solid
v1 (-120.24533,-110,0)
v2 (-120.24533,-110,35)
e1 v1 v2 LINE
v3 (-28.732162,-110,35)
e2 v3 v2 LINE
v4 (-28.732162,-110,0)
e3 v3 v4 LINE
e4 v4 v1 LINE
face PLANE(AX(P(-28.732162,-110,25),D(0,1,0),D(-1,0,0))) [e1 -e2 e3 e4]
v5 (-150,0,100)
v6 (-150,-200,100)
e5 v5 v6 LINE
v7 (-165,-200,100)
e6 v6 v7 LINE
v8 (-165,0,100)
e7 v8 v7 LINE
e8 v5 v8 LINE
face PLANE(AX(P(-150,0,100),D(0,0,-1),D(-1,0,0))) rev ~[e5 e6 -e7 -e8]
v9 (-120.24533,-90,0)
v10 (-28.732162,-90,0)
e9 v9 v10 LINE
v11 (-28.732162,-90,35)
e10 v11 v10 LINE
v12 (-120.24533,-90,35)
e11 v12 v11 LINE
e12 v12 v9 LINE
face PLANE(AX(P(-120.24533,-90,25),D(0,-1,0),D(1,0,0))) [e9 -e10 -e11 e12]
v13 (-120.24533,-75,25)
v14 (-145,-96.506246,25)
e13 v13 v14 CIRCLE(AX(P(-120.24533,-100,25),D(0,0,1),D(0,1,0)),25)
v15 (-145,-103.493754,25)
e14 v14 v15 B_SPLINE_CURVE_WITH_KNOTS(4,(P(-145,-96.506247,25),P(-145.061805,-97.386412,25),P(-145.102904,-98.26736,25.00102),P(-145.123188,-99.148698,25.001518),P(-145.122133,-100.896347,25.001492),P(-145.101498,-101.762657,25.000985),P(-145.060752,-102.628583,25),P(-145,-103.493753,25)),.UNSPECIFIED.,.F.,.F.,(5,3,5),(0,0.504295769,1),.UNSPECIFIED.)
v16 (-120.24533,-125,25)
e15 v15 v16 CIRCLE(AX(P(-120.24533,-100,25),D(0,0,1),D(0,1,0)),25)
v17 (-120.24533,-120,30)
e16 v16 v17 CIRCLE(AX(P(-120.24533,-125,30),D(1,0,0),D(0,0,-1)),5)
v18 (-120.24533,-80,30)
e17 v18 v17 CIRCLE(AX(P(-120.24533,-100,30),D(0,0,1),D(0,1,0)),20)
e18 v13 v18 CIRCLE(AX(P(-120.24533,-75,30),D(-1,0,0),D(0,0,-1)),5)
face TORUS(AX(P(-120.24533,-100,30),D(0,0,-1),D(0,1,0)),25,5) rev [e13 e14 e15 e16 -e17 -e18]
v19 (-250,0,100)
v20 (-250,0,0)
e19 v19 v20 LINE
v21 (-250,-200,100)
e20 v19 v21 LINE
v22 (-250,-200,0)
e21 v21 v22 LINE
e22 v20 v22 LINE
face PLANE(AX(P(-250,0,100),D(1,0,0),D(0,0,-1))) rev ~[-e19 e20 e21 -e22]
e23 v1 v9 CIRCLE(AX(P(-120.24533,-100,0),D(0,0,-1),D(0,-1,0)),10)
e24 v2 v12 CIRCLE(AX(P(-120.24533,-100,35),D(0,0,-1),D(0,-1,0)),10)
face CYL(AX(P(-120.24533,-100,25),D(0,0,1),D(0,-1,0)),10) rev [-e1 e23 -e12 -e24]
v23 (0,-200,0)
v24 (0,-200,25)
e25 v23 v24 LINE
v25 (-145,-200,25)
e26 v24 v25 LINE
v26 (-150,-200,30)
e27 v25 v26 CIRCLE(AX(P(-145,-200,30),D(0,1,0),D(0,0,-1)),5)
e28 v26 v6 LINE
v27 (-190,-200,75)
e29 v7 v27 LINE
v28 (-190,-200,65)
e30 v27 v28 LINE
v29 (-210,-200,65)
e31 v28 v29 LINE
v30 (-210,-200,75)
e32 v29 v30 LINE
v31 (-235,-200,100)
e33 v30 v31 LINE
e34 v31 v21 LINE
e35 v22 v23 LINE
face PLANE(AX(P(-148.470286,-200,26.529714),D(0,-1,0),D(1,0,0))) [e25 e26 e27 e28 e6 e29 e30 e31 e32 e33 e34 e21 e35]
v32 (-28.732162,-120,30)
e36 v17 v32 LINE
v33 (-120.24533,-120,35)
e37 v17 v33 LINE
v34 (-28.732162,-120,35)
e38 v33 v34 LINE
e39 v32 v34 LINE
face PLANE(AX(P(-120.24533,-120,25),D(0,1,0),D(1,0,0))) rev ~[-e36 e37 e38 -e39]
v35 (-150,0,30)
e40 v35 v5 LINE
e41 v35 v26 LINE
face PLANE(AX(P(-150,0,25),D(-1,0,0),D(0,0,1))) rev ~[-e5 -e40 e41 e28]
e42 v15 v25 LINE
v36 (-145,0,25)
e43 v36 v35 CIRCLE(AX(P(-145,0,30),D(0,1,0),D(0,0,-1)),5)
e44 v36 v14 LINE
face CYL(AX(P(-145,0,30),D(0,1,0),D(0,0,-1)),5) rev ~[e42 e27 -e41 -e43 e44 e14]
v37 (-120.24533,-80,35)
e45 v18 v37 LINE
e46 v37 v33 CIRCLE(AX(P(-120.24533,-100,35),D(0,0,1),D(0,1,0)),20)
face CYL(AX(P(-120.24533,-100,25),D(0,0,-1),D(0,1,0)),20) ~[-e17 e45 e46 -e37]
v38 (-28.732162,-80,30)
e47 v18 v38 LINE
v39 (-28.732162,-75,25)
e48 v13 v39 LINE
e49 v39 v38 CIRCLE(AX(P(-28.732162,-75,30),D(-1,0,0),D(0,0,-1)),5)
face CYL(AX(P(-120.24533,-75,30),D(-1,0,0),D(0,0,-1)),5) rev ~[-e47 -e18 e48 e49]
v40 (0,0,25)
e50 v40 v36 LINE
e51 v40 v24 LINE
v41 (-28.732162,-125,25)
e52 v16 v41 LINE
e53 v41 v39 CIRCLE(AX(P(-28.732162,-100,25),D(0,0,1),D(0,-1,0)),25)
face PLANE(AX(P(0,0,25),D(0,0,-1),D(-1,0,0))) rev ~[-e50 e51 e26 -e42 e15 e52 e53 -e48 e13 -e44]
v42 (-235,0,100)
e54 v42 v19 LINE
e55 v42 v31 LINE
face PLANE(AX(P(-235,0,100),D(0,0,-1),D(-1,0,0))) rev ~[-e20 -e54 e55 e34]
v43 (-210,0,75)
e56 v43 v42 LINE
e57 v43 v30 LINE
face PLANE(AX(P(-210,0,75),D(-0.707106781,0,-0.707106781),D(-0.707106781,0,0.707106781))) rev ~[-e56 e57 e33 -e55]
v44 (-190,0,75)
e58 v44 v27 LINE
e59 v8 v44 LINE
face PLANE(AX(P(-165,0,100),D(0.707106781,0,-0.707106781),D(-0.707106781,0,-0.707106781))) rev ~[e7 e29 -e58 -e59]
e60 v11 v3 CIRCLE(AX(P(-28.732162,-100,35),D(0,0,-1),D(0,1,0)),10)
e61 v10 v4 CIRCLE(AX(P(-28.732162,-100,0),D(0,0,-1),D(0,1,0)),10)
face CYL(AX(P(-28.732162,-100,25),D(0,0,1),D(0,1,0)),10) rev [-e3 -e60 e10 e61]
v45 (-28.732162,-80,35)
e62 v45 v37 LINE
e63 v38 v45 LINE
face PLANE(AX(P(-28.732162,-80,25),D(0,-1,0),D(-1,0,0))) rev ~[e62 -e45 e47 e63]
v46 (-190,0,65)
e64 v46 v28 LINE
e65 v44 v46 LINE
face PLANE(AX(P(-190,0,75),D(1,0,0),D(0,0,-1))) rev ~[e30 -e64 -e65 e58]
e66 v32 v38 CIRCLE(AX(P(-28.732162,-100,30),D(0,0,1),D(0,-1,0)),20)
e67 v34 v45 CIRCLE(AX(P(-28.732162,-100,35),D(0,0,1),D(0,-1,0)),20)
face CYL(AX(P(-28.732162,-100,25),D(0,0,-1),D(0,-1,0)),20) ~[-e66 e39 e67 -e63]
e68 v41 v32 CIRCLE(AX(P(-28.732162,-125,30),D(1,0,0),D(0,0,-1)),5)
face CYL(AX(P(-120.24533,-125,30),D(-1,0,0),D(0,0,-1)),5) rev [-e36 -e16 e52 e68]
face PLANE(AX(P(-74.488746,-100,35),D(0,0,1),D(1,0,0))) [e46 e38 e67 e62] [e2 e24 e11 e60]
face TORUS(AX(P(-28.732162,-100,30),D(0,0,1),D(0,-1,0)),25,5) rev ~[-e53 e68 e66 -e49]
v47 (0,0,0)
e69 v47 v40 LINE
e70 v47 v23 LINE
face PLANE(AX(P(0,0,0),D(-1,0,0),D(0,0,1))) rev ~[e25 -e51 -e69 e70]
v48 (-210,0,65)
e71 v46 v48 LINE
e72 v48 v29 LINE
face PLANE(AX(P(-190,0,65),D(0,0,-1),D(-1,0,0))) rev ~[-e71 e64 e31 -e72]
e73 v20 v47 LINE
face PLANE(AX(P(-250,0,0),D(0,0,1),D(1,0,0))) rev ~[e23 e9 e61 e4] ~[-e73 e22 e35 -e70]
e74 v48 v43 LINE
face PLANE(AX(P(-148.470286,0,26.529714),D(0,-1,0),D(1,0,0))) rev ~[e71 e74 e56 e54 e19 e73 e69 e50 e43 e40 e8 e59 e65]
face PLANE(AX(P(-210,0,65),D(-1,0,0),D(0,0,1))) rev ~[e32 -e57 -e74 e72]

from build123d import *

# Parameters (mm, degrees)
F1_DEPTH    = 200
F3_DEPTH    = 10
F4_DEPTH    = 25
F5_T1_DEPTH = 200
F5_T3_DEPTH = 91.5131680667
F5_T6_ANGLE = 180
F5_T8_ANGLE = 180


# Not quite as in the source:
# - a fillet or chamfer that OpenCascade refuses, or shapes differently, is made with other operations: its cross-section is extruded or revolved along the edge and cut away or added


with BuildPart() as f1:
    # F0 (on Front) → F1 (new body)
    with BuildSketch(Plane.XZ):
        Polygon((-250, 0), (0, 0), (0, 25), (-150, 25), (-150, 100), (-165, 100), (-190, 75), (-190, 65), (-210, 65), (-210, 75), (-235, 100), (-250, 100), align=None)
    extrude(amount=F1_DEPTH)

    # F2 (on face) → F3 (join)
    with BuildSketch(Plane.XY.offset(25)):
        with BuildLine():
            Line((-120.2453300357, -120), (-28.7321619689, -120))
            ThreePointArc((-28.7321619689, -120), (-8.7321619689, -100), (-28.7321619689, -80))
            Line((-28.7321619689, -80), (-120.2453300357, -80))
            ThreePointArc((-120.2453300357, -80), (-140.2453300357, -100), (-120.2453300357, -120))
        make_face()
        with BuildLine():
            ThreePointArc((-28.7321619689, -90), (-18.7321619689, -100), (-28.7321619689, -110))
            Line((-28.7321619689, -110), (-120.2453300357, -110))
            ThreePointArc((-120.2453300357, -110), (-130.2453300357, -100), (-120.2453300357, -90))
            Line((-120.2453300357, -90), (-28.7321619689, -90))
        make_face(mode=Mode.SUBTRACT)
    extrude(amount=F3_DEPTH)

    # F4 (cut): a face of the model
    f4_faces = [f1.faces().sort_by_distance(p)[0] for p in [
        (-74.4887460023, -100, 25),
    ]]
    extrude(f4_faces, amount=-F4_DEPTH, mode=Mode.SUBTRACT)

    # F5: fillet of radius 5 on 3 edges, made by hand

    # F5_s2 → F5_t1 (join)
    with BuildSketch(Plane.XZ):
        with BuildLine():
            ThreePointArc((-145, 25), (-148.5355339059, 26.4644660941), (-150, 30))
            Line((-150, 30), (-150, 25))
            Line((-150, 25), (-145, 25))
        make_face()
    extrude(amount=F5_T1_DEPTH)

    # F5_s4 → F5_t3 (join)
    with BuildSketch(Plane.YZ.offset(-120.2453300357)):
        with BuildLine():
            ThreePointArc((-125, 25), (-121.4644660941, 26.4644660941), (-120, 30))
            Line((-120, 30), (-120, 25))
            Line((-120, 25), (-125, 25))
        make_face()
        with BuildLine():
            ThreePointArc((-75, 25), (-78.5355339059, 26.4644660941), (-80, 30))
            Line((-80, 30), (-80, 25))
            Line((-80, 25), (-75, 25))
        make_face()
    extrude(amount=F5_T3_DEPTH)

    # F5_s5 → F5_t6 (revolve)
    with BuildSketch(Plane.YZ.offset(-28.7321619689)):
        with BuildLine():
            ThreePointArc((-120, 30), (-121.4644660941, 26.4644660941), (-125, 25))
            Line((-125, 25), (-120, 25))
            Line((-120, 25), (-120, 30))
        make_face()
    revolve(axis=Axis((-28.7321619689, -100, 25), (0, 0, 1)), revolution_arc=F5_T6_ANGLE)

    # F5_s7 → F5_t8 (revolve)
    with BuildSketch(Plane.YZ.offset(-120.2453300357)):
        with BuildLine():
            ThreePointArc((-75, 25), (-78.5355339059, 26.4644660941), (-80, 30))
            Line((-80, 30), (-80, 25))
            Line((-80, 25), (-75, 25))
        make_face()
    revolve(axis=Axis((-120.2453300357, -100, 25), (0, 0, 1)), revolution_arc=F5_T8_ANGLE)


solid = f1.part
